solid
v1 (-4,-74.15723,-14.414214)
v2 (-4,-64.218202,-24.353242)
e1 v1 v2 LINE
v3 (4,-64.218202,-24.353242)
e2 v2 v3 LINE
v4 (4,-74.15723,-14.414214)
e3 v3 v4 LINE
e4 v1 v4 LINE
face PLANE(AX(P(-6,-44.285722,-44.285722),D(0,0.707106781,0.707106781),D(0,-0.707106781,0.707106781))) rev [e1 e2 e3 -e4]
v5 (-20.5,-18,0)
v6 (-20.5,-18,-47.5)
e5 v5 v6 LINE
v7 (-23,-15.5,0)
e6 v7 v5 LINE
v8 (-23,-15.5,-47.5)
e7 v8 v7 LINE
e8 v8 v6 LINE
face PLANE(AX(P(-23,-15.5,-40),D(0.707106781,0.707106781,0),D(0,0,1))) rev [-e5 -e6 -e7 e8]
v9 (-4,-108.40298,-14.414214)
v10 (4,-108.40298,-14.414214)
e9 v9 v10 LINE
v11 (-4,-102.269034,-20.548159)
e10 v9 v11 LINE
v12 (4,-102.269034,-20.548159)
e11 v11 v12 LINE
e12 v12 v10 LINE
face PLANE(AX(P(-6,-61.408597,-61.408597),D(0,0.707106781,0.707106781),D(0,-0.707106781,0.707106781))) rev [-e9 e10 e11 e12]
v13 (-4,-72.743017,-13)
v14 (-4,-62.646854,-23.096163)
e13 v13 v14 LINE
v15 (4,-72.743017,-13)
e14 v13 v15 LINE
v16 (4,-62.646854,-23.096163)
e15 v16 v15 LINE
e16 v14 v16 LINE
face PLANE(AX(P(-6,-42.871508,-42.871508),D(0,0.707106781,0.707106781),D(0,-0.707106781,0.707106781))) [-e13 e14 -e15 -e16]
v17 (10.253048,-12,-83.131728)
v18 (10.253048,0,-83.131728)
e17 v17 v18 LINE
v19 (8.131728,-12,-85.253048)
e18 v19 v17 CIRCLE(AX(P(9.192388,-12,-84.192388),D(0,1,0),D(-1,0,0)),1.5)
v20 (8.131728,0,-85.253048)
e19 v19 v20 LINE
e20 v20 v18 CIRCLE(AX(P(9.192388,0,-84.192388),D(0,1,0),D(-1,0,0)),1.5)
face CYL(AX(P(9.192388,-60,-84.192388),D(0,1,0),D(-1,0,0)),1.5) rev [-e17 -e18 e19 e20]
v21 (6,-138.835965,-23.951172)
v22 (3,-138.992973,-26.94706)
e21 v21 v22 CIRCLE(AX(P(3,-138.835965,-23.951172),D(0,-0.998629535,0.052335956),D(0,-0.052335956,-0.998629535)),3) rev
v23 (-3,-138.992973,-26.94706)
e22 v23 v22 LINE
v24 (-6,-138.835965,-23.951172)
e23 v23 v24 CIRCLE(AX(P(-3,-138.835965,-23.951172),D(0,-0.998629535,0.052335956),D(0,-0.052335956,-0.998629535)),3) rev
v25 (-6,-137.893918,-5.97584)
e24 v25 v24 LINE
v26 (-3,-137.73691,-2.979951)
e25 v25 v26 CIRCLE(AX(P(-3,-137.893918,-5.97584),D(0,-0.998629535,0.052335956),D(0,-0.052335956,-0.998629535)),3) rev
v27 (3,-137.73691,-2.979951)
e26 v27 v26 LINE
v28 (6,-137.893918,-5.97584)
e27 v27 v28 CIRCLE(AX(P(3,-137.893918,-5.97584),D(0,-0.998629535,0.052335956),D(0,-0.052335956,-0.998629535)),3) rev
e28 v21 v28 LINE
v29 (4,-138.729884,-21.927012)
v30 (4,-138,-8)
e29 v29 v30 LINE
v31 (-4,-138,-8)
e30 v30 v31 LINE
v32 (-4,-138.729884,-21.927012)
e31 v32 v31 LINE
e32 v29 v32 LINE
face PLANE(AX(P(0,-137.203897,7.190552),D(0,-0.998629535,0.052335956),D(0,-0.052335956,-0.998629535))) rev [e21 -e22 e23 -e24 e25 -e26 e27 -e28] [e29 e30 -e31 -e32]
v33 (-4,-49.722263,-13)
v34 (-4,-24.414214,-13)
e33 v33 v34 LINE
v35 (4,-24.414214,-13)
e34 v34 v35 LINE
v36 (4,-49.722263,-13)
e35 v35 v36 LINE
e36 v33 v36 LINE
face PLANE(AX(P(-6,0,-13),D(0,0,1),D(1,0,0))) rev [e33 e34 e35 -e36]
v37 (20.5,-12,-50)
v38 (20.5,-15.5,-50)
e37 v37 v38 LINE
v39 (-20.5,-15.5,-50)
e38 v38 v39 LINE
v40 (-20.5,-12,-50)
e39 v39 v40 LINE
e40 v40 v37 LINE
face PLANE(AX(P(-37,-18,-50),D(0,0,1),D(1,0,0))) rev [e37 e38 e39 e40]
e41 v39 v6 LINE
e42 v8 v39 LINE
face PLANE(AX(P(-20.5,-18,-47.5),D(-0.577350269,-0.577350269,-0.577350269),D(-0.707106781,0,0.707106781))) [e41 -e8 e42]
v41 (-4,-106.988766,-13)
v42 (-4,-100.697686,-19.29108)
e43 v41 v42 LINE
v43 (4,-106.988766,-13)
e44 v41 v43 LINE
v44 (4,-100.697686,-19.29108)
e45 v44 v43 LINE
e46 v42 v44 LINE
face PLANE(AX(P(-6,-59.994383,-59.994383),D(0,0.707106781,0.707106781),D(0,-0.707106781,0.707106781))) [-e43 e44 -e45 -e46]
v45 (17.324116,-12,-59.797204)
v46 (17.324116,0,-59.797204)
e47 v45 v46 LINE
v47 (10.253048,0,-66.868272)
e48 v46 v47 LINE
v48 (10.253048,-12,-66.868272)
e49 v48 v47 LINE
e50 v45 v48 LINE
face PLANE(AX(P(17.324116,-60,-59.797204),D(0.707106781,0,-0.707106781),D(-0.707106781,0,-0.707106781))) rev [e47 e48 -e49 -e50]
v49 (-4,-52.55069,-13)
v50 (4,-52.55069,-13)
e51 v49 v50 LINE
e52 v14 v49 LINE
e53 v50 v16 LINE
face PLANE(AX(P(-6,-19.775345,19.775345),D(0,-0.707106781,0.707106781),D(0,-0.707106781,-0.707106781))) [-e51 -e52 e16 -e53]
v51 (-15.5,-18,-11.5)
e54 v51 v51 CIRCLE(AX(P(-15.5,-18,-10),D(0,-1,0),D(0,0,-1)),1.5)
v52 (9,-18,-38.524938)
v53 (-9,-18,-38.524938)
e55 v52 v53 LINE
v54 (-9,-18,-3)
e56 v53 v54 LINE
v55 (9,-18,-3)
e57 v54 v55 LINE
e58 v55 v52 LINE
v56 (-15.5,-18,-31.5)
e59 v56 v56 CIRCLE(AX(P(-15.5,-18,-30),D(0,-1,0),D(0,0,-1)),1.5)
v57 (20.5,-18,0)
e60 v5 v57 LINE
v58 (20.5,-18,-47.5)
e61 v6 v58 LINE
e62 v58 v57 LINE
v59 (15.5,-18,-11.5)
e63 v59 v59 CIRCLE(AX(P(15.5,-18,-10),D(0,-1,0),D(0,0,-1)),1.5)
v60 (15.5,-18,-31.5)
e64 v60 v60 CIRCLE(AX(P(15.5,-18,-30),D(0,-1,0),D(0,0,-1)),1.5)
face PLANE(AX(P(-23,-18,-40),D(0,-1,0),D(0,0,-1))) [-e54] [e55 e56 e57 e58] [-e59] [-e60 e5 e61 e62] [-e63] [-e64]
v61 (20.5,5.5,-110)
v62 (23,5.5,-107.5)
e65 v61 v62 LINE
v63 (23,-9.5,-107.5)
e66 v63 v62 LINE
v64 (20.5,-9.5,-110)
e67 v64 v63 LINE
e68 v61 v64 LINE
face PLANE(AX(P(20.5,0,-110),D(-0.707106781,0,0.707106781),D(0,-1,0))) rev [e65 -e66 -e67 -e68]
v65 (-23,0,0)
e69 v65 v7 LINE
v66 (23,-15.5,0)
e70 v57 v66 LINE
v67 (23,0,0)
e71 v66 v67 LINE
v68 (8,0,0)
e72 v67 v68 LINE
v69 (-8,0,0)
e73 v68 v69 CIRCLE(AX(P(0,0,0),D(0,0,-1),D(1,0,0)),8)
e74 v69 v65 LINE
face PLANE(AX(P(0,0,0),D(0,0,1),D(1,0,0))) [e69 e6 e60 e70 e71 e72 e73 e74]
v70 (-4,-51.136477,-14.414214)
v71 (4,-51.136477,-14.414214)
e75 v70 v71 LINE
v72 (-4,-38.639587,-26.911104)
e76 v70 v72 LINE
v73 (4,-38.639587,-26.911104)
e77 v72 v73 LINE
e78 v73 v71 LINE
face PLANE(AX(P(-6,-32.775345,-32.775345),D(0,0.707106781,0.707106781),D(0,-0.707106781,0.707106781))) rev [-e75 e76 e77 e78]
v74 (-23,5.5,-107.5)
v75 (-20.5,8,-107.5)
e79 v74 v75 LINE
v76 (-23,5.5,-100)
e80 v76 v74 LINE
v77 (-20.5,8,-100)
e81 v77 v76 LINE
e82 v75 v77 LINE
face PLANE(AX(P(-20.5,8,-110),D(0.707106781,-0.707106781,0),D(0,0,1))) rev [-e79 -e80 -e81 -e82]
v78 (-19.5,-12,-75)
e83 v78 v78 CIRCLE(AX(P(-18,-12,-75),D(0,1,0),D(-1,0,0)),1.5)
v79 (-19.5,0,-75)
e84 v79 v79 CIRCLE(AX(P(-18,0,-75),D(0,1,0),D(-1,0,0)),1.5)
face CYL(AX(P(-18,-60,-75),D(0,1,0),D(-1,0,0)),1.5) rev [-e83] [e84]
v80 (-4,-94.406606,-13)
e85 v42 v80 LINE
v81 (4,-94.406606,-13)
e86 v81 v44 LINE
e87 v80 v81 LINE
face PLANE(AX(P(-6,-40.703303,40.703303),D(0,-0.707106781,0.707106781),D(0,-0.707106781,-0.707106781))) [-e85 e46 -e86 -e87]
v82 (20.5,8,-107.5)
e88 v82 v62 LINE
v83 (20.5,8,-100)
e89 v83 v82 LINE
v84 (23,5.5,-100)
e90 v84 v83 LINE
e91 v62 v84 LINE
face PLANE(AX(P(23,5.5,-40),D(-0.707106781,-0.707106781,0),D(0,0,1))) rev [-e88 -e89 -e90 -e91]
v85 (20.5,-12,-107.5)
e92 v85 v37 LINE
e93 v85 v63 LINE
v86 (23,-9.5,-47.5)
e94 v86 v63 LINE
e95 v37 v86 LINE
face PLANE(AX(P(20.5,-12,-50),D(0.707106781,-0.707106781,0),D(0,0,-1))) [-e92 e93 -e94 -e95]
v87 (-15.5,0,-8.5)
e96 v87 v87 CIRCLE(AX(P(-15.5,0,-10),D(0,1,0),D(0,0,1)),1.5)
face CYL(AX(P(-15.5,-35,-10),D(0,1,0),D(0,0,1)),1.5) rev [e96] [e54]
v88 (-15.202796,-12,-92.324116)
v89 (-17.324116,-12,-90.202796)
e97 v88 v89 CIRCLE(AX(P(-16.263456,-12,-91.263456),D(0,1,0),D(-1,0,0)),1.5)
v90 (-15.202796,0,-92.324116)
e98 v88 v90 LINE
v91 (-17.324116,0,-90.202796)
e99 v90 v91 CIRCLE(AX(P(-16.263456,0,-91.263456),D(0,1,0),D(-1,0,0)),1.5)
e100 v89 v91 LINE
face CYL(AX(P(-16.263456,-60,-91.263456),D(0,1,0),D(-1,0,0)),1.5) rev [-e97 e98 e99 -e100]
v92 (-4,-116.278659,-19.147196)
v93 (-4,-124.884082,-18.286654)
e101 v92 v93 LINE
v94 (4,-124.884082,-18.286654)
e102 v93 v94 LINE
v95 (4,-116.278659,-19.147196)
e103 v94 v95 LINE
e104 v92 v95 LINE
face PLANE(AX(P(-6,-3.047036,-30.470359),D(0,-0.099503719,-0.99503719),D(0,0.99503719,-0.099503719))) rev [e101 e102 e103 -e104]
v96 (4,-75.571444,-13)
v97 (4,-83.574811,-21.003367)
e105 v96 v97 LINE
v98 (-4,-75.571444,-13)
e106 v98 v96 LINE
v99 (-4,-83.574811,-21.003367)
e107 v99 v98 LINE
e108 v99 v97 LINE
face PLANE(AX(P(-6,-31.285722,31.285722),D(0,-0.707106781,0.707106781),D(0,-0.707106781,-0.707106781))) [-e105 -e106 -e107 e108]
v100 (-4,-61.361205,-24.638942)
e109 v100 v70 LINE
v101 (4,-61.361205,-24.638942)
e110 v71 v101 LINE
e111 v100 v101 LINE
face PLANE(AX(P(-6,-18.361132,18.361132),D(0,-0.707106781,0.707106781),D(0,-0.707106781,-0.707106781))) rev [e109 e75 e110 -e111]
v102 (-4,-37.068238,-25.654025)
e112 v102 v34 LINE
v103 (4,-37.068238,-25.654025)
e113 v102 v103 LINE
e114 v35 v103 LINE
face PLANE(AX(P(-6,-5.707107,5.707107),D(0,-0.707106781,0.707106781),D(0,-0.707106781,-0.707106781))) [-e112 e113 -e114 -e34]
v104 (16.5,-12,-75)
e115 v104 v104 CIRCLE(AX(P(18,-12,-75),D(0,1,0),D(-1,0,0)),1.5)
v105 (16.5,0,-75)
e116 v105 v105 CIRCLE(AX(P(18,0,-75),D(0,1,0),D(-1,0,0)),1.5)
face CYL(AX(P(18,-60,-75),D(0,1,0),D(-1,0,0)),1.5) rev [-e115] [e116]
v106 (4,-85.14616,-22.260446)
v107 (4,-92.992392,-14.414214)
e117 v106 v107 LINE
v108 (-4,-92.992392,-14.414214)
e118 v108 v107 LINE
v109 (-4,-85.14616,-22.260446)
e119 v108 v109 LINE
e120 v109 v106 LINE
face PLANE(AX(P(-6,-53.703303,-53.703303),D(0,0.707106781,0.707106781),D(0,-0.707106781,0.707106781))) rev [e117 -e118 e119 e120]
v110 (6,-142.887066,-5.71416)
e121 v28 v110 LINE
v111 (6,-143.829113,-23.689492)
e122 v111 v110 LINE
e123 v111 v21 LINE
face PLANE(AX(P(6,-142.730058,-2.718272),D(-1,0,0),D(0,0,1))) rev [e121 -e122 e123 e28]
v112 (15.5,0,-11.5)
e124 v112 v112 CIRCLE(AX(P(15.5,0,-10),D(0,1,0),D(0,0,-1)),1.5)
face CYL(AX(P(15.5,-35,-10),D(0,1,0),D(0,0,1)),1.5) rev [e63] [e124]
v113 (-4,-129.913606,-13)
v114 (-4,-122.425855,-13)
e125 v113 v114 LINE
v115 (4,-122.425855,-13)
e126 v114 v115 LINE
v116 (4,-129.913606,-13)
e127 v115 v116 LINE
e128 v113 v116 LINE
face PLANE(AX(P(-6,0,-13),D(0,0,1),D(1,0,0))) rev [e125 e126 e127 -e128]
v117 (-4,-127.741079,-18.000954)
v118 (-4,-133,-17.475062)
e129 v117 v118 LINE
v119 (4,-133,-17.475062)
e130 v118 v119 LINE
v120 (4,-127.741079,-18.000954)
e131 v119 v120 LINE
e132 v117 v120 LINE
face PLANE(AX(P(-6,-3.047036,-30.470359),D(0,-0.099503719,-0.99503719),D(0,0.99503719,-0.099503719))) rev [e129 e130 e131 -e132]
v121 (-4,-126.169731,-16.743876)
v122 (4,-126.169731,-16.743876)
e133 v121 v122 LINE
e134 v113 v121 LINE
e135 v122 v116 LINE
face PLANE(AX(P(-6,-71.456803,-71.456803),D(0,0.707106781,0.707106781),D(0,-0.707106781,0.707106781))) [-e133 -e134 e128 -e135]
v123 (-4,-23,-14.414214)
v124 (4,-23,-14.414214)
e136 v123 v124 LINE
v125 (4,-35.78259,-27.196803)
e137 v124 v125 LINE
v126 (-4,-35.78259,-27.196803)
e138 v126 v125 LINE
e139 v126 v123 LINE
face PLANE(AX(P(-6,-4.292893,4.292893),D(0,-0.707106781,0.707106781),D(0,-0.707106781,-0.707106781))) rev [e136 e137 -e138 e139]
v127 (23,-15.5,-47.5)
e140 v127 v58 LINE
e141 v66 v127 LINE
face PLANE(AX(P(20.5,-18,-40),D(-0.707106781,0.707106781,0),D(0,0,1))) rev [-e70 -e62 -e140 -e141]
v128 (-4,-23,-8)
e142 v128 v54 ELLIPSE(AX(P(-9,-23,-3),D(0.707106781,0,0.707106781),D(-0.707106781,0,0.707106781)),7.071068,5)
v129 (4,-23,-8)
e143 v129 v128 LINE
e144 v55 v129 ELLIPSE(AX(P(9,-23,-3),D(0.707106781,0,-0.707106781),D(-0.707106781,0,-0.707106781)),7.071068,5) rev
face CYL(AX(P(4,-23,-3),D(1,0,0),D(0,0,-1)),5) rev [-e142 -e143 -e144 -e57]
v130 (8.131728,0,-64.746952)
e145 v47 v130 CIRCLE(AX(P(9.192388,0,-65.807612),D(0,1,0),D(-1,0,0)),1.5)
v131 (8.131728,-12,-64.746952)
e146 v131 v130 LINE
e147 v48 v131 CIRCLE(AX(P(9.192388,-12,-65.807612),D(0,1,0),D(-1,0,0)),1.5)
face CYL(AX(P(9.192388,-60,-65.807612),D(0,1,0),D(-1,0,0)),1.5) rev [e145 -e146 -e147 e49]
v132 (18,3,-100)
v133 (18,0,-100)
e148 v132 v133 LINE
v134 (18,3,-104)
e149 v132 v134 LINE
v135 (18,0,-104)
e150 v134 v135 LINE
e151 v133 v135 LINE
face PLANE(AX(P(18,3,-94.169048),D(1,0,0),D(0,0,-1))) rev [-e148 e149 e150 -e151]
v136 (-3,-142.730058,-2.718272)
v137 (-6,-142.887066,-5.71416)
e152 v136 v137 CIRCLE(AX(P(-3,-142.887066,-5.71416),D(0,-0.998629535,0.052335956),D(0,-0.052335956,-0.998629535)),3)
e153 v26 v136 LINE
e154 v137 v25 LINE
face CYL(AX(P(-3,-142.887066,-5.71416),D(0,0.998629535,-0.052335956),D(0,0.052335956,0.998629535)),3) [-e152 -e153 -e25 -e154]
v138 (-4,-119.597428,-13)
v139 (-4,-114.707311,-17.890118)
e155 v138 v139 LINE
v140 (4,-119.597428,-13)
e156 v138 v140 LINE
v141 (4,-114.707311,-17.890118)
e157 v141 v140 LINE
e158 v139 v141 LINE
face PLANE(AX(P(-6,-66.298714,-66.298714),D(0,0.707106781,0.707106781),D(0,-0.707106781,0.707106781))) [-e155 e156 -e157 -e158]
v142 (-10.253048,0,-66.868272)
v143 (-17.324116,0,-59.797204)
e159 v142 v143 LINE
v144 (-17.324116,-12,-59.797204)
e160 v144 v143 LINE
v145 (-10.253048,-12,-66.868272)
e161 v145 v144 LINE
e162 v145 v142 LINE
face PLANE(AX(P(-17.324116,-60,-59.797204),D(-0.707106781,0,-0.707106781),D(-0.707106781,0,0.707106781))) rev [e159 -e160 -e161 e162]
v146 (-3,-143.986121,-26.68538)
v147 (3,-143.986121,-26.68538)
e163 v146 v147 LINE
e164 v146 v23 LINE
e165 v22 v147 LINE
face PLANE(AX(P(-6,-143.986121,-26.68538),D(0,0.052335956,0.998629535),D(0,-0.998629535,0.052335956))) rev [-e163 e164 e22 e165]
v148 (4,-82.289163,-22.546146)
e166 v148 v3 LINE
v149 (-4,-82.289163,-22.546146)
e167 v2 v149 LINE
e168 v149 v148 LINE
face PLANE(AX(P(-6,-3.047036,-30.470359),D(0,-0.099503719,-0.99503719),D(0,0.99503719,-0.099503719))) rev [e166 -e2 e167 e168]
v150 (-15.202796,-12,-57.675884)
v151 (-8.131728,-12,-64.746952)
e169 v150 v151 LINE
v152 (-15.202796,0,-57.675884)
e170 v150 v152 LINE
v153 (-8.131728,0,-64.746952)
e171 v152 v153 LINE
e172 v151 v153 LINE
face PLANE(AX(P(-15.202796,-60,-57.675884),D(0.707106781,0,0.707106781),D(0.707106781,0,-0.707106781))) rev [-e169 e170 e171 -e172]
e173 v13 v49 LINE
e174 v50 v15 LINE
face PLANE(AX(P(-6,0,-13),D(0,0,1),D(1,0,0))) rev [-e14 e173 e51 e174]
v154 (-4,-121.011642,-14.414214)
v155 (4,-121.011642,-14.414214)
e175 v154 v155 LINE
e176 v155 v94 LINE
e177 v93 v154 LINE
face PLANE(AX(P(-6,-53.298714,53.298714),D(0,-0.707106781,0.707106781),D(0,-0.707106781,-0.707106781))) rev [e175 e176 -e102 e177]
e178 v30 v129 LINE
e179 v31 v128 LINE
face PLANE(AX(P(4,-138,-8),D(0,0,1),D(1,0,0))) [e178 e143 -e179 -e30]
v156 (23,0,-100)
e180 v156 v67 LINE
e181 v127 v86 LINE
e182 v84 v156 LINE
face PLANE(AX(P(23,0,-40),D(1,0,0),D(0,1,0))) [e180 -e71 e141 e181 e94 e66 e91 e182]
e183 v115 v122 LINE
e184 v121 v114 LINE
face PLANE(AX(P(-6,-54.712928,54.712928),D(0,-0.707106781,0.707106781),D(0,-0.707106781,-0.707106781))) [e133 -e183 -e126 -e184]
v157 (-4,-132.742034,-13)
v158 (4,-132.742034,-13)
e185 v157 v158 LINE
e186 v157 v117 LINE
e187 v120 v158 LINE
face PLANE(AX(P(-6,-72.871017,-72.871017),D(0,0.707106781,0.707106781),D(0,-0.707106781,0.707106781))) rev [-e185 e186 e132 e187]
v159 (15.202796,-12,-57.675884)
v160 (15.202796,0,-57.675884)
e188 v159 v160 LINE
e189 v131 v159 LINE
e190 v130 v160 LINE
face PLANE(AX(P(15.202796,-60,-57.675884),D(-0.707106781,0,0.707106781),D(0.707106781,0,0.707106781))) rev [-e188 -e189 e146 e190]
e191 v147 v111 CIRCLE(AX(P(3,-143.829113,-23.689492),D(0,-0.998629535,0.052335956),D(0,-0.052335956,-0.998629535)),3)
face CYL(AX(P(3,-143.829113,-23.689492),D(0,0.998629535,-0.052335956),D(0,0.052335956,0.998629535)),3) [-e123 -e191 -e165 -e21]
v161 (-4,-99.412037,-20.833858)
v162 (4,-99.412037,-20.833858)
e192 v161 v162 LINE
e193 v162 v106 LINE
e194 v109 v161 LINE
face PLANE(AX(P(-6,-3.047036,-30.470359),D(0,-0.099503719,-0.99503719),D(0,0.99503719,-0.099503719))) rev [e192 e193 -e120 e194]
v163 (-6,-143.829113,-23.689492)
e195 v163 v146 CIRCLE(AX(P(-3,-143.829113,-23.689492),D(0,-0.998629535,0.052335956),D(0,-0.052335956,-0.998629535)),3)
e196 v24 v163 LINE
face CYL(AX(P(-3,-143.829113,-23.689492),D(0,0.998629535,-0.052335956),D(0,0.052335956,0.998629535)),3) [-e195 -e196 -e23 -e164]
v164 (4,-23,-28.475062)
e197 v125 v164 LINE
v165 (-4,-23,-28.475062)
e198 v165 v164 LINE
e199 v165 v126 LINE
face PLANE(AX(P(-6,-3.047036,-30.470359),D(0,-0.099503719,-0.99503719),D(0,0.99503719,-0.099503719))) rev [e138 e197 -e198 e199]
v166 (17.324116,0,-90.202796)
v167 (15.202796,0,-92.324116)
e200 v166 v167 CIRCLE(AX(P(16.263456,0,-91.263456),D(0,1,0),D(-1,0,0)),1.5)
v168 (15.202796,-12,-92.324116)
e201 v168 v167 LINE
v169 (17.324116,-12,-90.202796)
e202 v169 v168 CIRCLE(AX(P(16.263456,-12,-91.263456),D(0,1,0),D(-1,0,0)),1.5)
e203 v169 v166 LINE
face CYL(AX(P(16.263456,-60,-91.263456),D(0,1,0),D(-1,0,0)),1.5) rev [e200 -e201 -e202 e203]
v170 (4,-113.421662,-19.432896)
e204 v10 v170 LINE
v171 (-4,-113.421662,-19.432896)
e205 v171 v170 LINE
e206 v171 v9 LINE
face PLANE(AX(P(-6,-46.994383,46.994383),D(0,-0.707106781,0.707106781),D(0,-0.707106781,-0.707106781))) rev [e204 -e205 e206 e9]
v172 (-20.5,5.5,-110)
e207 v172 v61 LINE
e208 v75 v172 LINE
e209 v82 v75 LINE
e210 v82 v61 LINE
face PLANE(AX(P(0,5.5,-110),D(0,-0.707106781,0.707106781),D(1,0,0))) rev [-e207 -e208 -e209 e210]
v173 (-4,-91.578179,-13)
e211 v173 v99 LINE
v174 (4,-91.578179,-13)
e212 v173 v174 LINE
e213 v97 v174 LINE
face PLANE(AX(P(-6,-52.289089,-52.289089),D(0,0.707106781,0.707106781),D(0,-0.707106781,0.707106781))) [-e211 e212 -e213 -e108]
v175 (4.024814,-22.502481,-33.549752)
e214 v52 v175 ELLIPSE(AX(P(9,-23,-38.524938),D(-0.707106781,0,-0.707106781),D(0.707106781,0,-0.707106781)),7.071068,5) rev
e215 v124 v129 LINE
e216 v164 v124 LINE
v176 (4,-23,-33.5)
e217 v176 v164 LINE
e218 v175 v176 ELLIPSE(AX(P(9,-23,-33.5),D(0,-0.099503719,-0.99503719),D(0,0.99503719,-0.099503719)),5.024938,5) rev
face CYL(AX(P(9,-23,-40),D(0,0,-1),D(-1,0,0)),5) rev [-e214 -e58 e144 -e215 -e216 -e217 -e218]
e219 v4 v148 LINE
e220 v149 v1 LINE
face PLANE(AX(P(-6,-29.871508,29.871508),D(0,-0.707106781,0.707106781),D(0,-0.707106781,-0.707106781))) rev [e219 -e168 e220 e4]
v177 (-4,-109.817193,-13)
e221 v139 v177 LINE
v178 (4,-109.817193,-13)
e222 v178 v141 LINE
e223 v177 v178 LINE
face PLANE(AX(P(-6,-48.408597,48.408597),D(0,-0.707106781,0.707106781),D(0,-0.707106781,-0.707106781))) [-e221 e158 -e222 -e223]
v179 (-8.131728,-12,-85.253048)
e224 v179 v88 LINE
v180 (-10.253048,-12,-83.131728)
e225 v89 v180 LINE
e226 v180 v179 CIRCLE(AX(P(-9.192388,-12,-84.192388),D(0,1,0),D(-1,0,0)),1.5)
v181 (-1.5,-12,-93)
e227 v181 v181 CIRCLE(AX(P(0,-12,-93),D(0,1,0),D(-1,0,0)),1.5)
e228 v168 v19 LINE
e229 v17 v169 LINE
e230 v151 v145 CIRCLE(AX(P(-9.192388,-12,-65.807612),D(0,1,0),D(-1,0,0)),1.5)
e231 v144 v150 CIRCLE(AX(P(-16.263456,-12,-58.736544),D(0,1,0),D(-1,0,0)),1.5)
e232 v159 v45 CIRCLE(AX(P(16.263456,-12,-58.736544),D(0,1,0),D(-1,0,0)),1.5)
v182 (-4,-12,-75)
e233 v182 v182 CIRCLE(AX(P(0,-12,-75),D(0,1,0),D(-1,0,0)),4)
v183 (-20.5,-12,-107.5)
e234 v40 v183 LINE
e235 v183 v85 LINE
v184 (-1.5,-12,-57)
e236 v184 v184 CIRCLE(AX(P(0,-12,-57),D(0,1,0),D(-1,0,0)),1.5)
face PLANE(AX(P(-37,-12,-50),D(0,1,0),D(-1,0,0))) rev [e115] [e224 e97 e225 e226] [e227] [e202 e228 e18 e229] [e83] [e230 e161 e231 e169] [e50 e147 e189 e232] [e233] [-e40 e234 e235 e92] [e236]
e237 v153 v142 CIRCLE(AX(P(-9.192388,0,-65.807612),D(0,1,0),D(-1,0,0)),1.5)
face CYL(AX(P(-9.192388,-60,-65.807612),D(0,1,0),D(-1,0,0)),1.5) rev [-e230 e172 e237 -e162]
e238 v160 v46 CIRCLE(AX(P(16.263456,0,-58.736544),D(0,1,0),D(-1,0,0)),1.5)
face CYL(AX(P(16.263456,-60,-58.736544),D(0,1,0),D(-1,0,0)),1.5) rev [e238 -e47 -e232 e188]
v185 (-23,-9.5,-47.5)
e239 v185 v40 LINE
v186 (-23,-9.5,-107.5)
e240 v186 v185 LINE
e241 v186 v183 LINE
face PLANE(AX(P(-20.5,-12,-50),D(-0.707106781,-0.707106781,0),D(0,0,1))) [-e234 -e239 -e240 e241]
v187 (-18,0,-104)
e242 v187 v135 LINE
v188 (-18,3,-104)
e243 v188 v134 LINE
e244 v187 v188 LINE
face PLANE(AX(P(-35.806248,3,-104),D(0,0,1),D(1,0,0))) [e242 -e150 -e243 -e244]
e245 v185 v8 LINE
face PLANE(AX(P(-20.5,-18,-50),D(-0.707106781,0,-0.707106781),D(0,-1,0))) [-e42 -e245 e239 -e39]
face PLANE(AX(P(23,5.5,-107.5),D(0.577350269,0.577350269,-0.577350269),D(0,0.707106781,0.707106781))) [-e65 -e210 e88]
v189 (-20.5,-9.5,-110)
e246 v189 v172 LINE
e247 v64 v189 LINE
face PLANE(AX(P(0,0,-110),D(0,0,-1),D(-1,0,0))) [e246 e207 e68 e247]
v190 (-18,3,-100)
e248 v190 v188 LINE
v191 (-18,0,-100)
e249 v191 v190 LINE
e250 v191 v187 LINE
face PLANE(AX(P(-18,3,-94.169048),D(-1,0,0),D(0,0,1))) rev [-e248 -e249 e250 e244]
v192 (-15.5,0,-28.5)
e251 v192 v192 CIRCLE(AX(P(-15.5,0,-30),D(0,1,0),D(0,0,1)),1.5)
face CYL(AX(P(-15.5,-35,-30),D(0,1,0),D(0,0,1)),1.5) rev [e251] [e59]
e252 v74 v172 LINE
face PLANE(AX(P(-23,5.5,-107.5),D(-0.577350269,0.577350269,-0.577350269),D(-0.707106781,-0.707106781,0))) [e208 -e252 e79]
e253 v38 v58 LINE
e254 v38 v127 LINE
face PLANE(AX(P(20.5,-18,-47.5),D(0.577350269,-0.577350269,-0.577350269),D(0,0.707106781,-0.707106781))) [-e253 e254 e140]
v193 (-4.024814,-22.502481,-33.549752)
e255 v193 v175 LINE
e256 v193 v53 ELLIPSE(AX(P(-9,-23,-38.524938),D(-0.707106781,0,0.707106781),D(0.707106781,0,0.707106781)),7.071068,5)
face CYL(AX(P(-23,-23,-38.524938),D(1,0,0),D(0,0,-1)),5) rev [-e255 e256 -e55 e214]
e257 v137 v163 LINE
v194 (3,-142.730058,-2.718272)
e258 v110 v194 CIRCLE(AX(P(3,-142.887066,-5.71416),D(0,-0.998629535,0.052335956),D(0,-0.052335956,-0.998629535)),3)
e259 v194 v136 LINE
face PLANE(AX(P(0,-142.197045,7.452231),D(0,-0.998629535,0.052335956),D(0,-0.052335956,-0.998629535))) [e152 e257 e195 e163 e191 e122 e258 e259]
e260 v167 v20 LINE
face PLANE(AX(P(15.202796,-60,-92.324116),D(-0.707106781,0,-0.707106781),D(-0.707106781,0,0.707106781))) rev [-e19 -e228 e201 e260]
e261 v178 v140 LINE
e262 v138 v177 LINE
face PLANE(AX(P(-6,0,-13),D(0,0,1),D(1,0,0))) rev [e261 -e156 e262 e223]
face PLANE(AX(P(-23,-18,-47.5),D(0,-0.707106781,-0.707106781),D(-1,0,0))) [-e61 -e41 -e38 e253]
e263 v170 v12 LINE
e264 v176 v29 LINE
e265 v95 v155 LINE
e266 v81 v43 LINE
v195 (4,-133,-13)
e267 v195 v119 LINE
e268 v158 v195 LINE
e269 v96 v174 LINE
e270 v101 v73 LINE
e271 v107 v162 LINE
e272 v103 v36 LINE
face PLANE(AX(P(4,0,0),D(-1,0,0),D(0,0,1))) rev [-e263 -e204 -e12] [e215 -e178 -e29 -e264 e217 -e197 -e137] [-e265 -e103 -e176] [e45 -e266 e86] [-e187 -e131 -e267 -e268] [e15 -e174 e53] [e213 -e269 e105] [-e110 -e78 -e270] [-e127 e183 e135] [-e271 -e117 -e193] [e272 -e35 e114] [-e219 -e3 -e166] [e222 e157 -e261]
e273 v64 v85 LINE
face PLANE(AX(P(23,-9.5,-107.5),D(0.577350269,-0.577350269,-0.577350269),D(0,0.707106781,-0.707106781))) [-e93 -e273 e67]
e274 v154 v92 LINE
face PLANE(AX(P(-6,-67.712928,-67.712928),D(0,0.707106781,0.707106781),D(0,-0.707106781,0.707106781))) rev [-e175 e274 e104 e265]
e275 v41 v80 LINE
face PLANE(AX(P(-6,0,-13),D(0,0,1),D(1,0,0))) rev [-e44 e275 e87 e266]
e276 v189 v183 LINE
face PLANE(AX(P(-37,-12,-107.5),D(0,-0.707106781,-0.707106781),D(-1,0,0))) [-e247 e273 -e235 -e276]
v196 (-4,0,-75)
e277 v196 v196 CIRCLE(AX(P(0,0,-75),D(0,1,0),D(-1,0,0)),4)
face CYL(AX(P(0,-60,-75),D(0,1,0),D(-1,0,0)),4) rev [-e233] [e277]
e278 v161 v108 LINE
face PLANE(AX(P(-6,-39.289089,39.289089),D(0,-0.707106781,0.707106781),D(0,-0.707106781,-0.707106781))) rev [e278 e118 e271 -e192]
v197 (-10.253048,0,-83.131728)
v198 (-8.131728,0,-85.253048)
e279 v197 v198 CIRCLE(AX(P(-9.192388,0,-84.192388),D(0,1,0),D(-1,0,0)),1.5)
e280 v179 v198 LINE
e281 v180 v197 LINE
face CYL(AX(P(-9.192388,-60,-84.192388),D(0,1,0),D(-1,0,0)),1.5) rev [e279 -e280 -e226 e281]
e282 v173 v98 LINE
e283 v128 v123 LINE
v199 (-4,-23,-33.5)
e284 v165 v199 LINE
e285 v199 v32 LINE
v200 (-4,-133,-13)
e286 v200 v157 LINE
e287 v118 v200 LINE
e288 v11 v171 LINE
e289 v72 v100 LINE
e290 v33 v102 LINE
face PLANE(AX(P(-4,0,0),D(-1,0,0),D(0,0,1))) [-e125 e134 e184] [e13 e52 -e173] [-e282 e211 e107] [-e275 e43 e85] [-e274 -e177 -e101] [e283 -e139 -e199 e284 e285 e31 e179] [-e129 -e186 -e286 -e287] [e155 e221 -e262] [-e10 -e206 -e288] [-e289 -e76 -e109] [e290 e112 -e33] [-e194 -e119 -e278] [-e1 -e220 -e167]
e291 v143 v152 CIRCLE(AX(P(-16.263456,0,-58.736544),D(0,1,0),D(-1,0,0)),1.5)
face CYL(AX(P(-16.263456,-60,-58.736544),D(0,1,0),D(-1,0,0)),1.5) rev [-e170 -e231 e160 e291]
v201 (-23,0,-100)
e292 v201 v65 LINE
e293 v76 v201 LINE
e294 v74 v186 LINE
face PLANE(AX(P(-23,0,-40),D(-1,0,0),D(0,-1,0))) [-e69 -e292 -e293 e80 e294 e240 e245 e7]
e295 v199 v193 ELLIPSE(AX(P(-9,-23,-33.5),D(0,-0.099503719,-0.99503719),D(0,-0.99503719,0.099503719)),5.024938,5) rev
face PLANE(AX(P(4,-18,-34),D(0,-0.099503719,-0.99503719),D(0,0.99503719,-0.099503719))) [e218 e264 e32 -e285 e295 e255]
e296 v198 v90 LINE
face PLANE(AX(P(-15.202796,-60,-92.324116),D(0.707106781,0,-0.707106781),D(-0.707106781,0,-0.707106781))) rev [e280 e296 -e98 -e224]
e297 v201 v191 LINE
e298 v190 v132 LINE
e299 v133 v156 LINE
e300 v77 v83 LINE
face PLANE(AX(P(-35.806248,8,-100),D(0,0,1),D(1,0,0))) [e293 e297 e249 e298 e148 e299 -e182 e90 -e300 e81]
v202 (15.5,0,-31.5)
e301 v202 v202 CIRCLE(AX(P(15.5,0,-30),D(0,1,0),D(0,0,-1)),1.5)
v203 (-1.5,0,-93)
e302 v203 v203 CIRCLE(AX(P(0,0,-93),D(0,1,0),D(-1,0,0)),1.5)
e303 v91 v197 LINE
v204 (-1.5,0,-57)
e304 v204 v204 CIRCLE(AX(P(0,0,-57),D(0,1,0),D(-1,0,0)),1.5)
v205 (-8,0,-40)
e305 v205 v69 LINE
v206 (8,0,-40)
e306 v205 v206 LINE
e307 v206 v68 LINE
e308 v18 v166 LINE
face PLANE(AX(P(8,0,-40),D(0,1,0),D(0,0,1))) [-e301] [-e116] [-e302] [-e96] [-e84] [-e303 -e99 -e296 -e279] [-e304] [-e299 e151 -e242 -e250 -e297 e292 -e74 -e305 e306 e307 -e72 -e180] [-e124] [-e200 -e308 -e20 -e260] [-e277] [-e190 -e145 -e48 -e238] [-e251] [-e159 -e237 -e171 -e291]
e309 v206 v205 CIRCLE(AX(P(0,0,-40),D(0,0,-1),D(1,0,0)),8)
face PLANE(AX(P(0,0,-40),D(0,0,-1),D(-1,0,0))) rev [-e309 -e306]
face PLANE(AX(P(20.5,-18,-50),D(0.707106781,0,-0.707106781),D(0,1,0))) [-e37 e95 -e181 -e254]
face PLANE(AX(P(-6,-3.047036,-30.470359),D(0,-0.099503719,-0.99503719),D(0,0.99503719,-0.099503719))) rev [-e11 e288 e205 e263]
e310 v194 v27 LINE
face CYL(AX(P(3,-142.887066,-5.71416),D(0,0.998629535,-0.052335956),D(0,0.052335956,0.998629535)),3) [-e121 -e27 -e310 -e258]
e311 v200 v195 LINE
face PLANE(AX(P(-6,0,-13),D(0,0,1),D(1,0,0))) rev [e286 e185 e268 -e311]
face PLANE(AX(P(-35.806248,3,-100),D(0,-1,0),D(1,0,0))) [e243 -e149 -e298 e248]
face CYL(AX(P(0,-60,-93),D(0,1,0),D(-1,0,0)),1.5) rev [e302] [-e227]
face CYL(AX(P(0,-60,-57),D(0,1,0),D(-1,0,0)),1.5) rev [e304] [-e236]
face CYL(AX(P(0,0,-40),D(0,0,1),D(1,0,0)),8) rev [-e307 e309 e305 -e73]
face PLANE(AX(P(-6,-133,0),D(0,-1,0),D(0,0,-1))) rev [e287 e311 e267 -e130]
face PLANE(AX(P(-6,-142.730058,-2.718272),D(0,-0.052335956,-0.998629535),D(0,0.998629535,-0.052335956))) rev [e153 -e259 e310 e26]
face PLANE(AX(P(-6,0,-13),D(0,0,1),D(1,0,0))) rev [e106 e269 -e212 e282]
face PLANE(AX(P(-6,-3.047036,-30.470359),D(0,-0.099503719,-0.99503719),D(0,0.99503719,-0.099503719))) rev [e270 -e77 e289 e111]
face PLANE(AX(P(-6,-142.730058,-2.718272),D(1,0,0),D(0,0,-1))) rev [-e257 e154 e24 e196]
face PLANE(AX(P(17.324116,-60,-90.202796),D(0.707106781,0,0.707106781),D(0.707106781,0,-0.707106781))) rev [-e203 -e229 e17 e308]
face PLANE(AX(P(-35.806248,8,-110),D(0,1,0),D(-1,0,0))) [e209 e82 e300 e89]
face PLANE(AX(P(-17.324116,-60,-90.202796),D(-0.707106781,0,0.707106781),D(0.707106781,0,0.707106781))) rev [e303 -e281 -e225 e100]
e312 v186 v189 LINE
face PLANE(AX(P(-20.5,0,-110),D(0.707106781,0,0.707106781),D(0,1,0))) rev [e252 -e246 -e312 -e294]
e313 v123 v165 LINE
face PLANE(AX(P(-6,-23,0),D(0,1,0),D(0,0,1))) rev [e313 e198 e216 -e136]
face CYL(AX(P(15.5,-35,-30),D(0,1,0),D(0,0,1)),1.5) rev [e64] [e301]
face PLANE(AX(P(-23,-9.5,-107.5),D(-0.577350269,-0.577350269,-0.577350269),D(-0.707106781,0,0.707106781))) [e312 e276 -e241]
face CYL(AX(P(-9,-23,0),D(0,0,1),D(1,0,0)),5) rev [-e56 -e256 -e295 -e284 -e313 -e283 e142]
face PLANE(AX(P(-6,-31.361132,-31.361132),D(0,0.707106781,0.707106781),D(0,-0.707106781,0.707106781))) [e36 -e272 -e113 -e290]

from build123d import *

# Parameters (mm, degrees)
Y_KSEKLIK_EKSTR_ZYON1_DEPTH = 40
IZIM2_W                     = 46
IZIM2_H                     = 18
Y_KSEKLIK_EKSTR_ZYON2_DEPTH = 70
IZIM3_W                     = 60
IZIM3_H                     = 6
KES_EKSTR_ZYON1_DEPTH       = 60
IZIM4_R                     = 4
IZIM4_R_2                   = 1.5
KES_EKSTR_ZYON2_DEPTH       = 60
Y_KSEKLIK_EKSTR_ZYON3_DEPTH = 46
PAH4_SIZE                   = 2.5
IZIM7_W                     = 5
IZIM7_H                     = 3
Y_KSEKLIK_EKSTR_ZYON4_DEPTH = 4
Y_KSEKLIK_EKSTR_ZYON5_DEPTH = 4
KES_EKSTR_ZYON4_DEPTH       = 10
RADYUS2_START               = -4
RADYUS2_DEPTH               = 8
RADYUS2_START_2             = -38.524937811
RADYUS2_2_DEPTH             = 35.524937811
RADYUS2_START_3             = -10
RADYUS2_3_DEPTH             = 20
Y_KSEKLIK_EKSTR_ZYON6_DEPTH = 8
IZIM12_W                    = 12
IZIM12_H                    = 24
Y_KSEKLIK_EKSTR_ZYON7_DEPTH = 5
RADYUS3_R                   = 3
IZIM13_R                    = 1.5
KES_EKSTR_ZYON5_DEPTH       = 35


with BuildPart() as part:
    # Çizim1 → Yükseklik-Ekstrüzyon1 (new body)
    with BuildSketch(Plane.XY):
        with BuildLine():
            Line((-8, 0), (-23, 0))
            Line((-23, 0), (-23, -18))
            Line((-23, -18), (23, -18))
            Line((23, -18), (23, 0))
            Line((23, 0), (8, 0))
            ThreePointArc((8, 0), (0, -8), (-8, 0))
        make_face()
    extrude(amount=-Y_KSEKLIK_EKSTR_ZYON1_DEPTH)

    # Çizim2 → Yükseklik-Ekstrüzyon2 (add)
    with BuildSketch(Plane(origin=(0, 0, -40), x_dir=(-1, 0, 0), z_dir=(0, 0, -1))):
        with Locations((0, -9)):
            Rectangle(IZIM2_W, IZIM2_H)
    extrude(amount=Y_KSEKLIK_EKSTR_ZYON2_DEPTH)

    # Çizim3 → Kes-Ekstrüzyon1 (cut)
    with BuildSketch(Plane(origin=(23, 0, 0), x_dir=(0, 0, -1), z_dir=(1, 0, 0))):
        with Locations((80, -15)):
            Rectangle(IZIM3_W, IZIM3_H)
    extrude(amount=-KES_EKSTR_ZYON1_DEPTH, mode=Mode.SUBTRACT)

    # Çizim4 → Kes-Ekstrüzyon2 (cut)
    with BuildSketch(Plane(origin=(0, 0, 0), x_dir=(1, 0, 0), z_dir=(0, 1, 0))):
        with Locations(Location((0, 75, 0), (0, 0, 180))):
            Circle(IZIM4_R)
        with Locations(Location((0, 57, 0), (0, 0, 180))):
            Circle(IZIM4_R_2)
        with Locations(Location((-18, 75, 0), (0, 0, 180))):
            Circle(IZIM4_R_2)
        with Locations(Location((0, 93, 0), (0, 0, 180))):
            Circle(IZIM4_R_2)
        with Locations(Location((18, 75, 0), (0, 0, 180))):
            Circle(IZIM4_R_2)
        with BuildLine():
            Line((-15.202795796, 92.324116139), (-8.131727984, 85.253048327))
            ThreePointArc((-8.131727984, 85.253048327), (-8.131727984, 83.131727984), (-10.253048327, 83.131727984))
            Line((-10.253048327, 83.131727984), (-17.324116139, 90.202795796))
            ThreePointArc((-17.324116139, 90.202795796), (-17.324116139, 92.324116139), (-15.202795796, 92.324116139))
        make_face()
        with BuildLine():
            Line((15.202795796, 92.324116139), (8.131727984, 85.253048327))
            ThreePointArc((8.131727984, 85.253048327), (8.131727984, 83.131727984), (10.253048327, 83.131727984))
            Line((10.253048327, 83.131727984), (17.324116139, 90.202795796))
            ThreePointArc((17.324116139, 90.202795796), (17.324116139, 92.324116139), (15.202795796, 92.324116139))
        make_face()
        with BuildLine():
            Line((17.324116139, 59.797204204), (10.253048327, 66.868272016))
            ThreePointArc((10.253048327, 66.868272016), (8.131727984, 66.868272016), (8.131727984, 64.746951673))
            Line((8.131727984, 64.746951673), (15.202795796, 57.675883861))
            ThreePointArc((15.202795796, 57.675883861), (17.324116139, 57.675883861), (17.324116139, 59.797204204))
        make_face()
        with BuildLine():
            Line((-15.202795796, 57.675883861), (-8.131727984, 64.746951673))
            ThreePointArc((-8.131727984, 64.746951673), (-8.131727984, 66.868272016), (-10.253048327, 66.868272016))
            Line((-10.253048327, 66.868272016), (-17.324116139, 59.797204204))
            ThreePointArc((-17.324116139, 59.797204204), (-17.324116139, 57.675883861), (-15.202795796, 57.675883861))
        make_face()
    extrude(amount=-KES_EKSTR_ZYON2_DEPTH, mode=Mode.SUBTRACT)

    # Çizim5 → Yükseklik-Ekstrüzyon3 (add)
    with BuildSketch(Plane(origin=(23, 0, 0), x_dir=(0, 0, -1), z_dir=(1, 0, 0))):
        Polygon((110, 0), (110, 8), (100, 8), (100, 3), (104, 3), (104, 0), align=None)
    extrude(amount=-Y_KSEKLIK_EKSTR_ZYON3_DEPTH)

    # Pah4
    pah4_edges = [part.edges().sort_by_distance(p)[0] for p in [
        (23, 8, -105),
        (0, 8, -110),
        (-23, 8, -105),
        (23, -2, -110),
        (-23, -2, -110),
        (0, -12, -110),
        (-23, -18, -25),
        (-23, -15, -50),
        (23, -18, -25),
        (-23, -12, -80),
        (0, -18, -50),
        (23, -15, -50),
        (23, -12, -80),
    ]]
    chamfer(pah4_edges, length=PAH4_SIZE)

    # Çizim7 → Yükseklik-Ekstrüzyon4 (add)
    with BuildSketch(Plane.XY.offset(-104)):
        with Locations((-20.5, 1.5)):
            Rectangle(IZIM7_W, IZIM7_H)
        with Locations((20.5, 1.5)):
            Rectangle(IZIM7_W, IZIM7_H)
    extrude(amount=Y_KSEKLIK_EKSTR_ZYON4_DEPTH)

    # Çizim9 → Yükseklik-Ekstrüzyon5 (add, symmetric)
    with BuildSketch(Plane(origin=(0, 0, 0), x_dir=(0, 0, -1), z_dir=(1, 0, 0))):
        Polygon((8, -18), (34, -18), (22, -138), (8, -138), align=None)
    extrude(amount=Y_KSEKLIK_EKSTR_ZYON5_DEPTH, both=True)

    # Çizim10 → Kes-Ekstrüzyon4 (cut)
    with BuildSketch(Plane(origin=(4, 0, 0), x_dir=(0, 0, -1), z_dir=(1, 0, 0))):
        Polygon((13, -132.742033617), (13, -133), (17.475062189, -133), (18.000954253, -127.741079364), (13.707106781, -132.034926836), align=None)
        Polygon((13, -122.42585543), (13, -129.913606492), (16.743875531, -126.169730961), align=None)
        Polygon((14.414213562, -121.011641868), (18.286653963, -124.884082268), (19.147196274, -116.278659157), align=None)
        Polygon((13, -109.817193202), (13, -119.597428306), (17.890117552, -114.707310754), align=None)
        Polygon((14.414213562, -108.40297964), (19.432895983, -113.421662061), (20.548158744, -102.269034459), align=None)
        Polygon((13, -94.406606035), (13, -106.988766077), (19.291080021, -100.697686056), align=None)
        Polygon((14.414213562, -92.992392472), (20.833858453, -99.412037363), (22.260446207, -85.146159828), align=None)
        Polygon((13, -75.571443941), (13, -91.57817891), (21.003367485, -83.574811425), align=None)
        Polygon((14.414213562, -74.157230378), (22.546145916, -82.289162732), (24.353241995, -64.218201946), align=None)
        Polygon((13, -52.55069027), (13, -72.743016816), (23.096163273, -62.646853543), align=None)
        Polygon((14.414213562, -51.136476708), (24.638941704, -61.36120485), (26.911103514, -38.639586757), align=None)
        Polygon((13, -24.414213562), (13, -49.722263146), (25.654024792, -37.068238354), align=None)
        Polygon((14.414213562, -23), (27.196803223, -35.782589661), (28.475062189, -23), align=None)
    extrude(amount=-KES_EKSTR_ZYON4_DEPTH, mode=Mode.SUBTRACT)

    # Radyus2: read off the stored shape, not the designer's step
    # Radyus2 outline → Radyus2 (add)
    with BuildSketch(Plane.YZ.offset(RADYUS2_START)):
        with BuildLine():
            Line((-18, -38.524937811), (-18, -34))
            Line((-18, -34), (-22.502481405, -33.54975186))
            ThreePointArc((-22.502481405, -33.54975186), (-19.292737332, -35.169911207), (-18, -38.524937811))
        make_face()
        with BuildLine():
            ThreePointArc((-18, -3), (-19.464466094, -6.535533906), (-23, -8))
            Line((-23, -8), (-18, -8))
            Line((-18, -8), (-18, -3))
        make_face()
    extrude(amount=RADYUS2_DEPTH)

    # Radyus2 2 outline → Radyus2 2 (add)
    with BuildSketch(Plane.XY.offset(RADYUS2_START_2)):
        with BuildLine():
            Line((4, -18), (4, -23))
            ThreePointArc((4, -23), (5.464466094, -19.464466094), (9, -18))
            Line((9, -18), (4, -18))
        make_face()
        with BuildLine():
            Line((-4, -23), (-4, -18))
            Line((-4, -18), (-9, -18))
            ThreePointArc((-9, -18), (-5.464466094, -19.464466094), (-4, -23))
        make_face()
    extrude(amount=RADYUS2_2_DEPTH)

    # Radyus2 3 outline → Radyus2 3 (cut)
    with BuildSketch(Plane.YZ.offset(RADYUS2_START_3)):
        with BuildLine():
            Line((-22.502481405, -33.54975186), (-23, -33.5))
            Line((-23, -33.5), (-23, -38.524937811))
            Line((-23, -38.524937811), (-18, -38.524937811))
            ThreePointArc((-18, -38.524937811), (-19.292737332, -35.169911207), (-22.502481405, -33.54975186))
        make_face()
        with BuildLine():
            Line((-23, -3), (-23, -8))
            ThreePointArc((-23, -8), (-19.464466094, -6.535533906), (-18, -3))
            Line((-18, -3), (-23, -3))
        make_face()
    extrude(amount=RADYUS2_3_DEPTH, mode=Mode.SUBTRACT)

    # Çizim11 → Yükseklik-Ekstrüzyon6 (add)
    with BuildSketch(Plane.ZY.offset(4)):
        Polygon((-22, -138), (-21.927011625, -138.729883751), (-8, -138), align=None)
    extrude(amount=-Y_KSEKLIK_EKSTR_ZYON6_DEPTH)

    # Çizim12 → Yükseklik-Ekstrüzyon7 (add)
    with BuildSketch(Plane(origin=(0, -137.203896927, 7.190551547), x_dir=(1, 0, 0), z_dir=(0, -0.9986295347545744, 0.05233595624293665))):
        with Locations((0, -22.184460391)):
            Rectangle(IZIM12_W, IZIM12_H)
    extrude(amount=Y_KSEKLIK_EKSTR_ZYON7_DEPTH)

    # Radyus3
    radyus3_edges = [part.edges().sort_by_distance(p)[0] for p in [
        (6, -141.489547187, -26.816220339),
        (6, -140.233484238, -2.849111505),
        (-6, -140.233484238, -2.849111505),
        (-6, -141.489547187, -26.816220339),
    ]]
    fillet(radyus3_edges, radius=RADYUS3_R)

    # Çizim13 → Kes-Ekstrüzyon5 (cut)
    with BuildSketch(Plane(origin=(0, 0, 0), x_dir=(1, 0, 0), z_dir=(0, 1, 0))):
        with Locations(Location((-15.5, 10, 0), (0, 0, 270))):
            Circle(IZIM13_R)
        with Locations(Location((-15.5, 30, 0), (0, 0, 270))):
            Circle(IZIM13_R)
        with Locations(Location((15.5, 30, 0), (0, 0, 90))):
            Circle(IZIM13_R)
        with Locations(Location((15.5, 10, 0), (0, 0, 90))):
            Circle(IZIM13_R)
    extrude(amount=-KES_EKSTR_ZYON5_DEPTH, mode=Mode.SUBTRACT)


solid = part.part
